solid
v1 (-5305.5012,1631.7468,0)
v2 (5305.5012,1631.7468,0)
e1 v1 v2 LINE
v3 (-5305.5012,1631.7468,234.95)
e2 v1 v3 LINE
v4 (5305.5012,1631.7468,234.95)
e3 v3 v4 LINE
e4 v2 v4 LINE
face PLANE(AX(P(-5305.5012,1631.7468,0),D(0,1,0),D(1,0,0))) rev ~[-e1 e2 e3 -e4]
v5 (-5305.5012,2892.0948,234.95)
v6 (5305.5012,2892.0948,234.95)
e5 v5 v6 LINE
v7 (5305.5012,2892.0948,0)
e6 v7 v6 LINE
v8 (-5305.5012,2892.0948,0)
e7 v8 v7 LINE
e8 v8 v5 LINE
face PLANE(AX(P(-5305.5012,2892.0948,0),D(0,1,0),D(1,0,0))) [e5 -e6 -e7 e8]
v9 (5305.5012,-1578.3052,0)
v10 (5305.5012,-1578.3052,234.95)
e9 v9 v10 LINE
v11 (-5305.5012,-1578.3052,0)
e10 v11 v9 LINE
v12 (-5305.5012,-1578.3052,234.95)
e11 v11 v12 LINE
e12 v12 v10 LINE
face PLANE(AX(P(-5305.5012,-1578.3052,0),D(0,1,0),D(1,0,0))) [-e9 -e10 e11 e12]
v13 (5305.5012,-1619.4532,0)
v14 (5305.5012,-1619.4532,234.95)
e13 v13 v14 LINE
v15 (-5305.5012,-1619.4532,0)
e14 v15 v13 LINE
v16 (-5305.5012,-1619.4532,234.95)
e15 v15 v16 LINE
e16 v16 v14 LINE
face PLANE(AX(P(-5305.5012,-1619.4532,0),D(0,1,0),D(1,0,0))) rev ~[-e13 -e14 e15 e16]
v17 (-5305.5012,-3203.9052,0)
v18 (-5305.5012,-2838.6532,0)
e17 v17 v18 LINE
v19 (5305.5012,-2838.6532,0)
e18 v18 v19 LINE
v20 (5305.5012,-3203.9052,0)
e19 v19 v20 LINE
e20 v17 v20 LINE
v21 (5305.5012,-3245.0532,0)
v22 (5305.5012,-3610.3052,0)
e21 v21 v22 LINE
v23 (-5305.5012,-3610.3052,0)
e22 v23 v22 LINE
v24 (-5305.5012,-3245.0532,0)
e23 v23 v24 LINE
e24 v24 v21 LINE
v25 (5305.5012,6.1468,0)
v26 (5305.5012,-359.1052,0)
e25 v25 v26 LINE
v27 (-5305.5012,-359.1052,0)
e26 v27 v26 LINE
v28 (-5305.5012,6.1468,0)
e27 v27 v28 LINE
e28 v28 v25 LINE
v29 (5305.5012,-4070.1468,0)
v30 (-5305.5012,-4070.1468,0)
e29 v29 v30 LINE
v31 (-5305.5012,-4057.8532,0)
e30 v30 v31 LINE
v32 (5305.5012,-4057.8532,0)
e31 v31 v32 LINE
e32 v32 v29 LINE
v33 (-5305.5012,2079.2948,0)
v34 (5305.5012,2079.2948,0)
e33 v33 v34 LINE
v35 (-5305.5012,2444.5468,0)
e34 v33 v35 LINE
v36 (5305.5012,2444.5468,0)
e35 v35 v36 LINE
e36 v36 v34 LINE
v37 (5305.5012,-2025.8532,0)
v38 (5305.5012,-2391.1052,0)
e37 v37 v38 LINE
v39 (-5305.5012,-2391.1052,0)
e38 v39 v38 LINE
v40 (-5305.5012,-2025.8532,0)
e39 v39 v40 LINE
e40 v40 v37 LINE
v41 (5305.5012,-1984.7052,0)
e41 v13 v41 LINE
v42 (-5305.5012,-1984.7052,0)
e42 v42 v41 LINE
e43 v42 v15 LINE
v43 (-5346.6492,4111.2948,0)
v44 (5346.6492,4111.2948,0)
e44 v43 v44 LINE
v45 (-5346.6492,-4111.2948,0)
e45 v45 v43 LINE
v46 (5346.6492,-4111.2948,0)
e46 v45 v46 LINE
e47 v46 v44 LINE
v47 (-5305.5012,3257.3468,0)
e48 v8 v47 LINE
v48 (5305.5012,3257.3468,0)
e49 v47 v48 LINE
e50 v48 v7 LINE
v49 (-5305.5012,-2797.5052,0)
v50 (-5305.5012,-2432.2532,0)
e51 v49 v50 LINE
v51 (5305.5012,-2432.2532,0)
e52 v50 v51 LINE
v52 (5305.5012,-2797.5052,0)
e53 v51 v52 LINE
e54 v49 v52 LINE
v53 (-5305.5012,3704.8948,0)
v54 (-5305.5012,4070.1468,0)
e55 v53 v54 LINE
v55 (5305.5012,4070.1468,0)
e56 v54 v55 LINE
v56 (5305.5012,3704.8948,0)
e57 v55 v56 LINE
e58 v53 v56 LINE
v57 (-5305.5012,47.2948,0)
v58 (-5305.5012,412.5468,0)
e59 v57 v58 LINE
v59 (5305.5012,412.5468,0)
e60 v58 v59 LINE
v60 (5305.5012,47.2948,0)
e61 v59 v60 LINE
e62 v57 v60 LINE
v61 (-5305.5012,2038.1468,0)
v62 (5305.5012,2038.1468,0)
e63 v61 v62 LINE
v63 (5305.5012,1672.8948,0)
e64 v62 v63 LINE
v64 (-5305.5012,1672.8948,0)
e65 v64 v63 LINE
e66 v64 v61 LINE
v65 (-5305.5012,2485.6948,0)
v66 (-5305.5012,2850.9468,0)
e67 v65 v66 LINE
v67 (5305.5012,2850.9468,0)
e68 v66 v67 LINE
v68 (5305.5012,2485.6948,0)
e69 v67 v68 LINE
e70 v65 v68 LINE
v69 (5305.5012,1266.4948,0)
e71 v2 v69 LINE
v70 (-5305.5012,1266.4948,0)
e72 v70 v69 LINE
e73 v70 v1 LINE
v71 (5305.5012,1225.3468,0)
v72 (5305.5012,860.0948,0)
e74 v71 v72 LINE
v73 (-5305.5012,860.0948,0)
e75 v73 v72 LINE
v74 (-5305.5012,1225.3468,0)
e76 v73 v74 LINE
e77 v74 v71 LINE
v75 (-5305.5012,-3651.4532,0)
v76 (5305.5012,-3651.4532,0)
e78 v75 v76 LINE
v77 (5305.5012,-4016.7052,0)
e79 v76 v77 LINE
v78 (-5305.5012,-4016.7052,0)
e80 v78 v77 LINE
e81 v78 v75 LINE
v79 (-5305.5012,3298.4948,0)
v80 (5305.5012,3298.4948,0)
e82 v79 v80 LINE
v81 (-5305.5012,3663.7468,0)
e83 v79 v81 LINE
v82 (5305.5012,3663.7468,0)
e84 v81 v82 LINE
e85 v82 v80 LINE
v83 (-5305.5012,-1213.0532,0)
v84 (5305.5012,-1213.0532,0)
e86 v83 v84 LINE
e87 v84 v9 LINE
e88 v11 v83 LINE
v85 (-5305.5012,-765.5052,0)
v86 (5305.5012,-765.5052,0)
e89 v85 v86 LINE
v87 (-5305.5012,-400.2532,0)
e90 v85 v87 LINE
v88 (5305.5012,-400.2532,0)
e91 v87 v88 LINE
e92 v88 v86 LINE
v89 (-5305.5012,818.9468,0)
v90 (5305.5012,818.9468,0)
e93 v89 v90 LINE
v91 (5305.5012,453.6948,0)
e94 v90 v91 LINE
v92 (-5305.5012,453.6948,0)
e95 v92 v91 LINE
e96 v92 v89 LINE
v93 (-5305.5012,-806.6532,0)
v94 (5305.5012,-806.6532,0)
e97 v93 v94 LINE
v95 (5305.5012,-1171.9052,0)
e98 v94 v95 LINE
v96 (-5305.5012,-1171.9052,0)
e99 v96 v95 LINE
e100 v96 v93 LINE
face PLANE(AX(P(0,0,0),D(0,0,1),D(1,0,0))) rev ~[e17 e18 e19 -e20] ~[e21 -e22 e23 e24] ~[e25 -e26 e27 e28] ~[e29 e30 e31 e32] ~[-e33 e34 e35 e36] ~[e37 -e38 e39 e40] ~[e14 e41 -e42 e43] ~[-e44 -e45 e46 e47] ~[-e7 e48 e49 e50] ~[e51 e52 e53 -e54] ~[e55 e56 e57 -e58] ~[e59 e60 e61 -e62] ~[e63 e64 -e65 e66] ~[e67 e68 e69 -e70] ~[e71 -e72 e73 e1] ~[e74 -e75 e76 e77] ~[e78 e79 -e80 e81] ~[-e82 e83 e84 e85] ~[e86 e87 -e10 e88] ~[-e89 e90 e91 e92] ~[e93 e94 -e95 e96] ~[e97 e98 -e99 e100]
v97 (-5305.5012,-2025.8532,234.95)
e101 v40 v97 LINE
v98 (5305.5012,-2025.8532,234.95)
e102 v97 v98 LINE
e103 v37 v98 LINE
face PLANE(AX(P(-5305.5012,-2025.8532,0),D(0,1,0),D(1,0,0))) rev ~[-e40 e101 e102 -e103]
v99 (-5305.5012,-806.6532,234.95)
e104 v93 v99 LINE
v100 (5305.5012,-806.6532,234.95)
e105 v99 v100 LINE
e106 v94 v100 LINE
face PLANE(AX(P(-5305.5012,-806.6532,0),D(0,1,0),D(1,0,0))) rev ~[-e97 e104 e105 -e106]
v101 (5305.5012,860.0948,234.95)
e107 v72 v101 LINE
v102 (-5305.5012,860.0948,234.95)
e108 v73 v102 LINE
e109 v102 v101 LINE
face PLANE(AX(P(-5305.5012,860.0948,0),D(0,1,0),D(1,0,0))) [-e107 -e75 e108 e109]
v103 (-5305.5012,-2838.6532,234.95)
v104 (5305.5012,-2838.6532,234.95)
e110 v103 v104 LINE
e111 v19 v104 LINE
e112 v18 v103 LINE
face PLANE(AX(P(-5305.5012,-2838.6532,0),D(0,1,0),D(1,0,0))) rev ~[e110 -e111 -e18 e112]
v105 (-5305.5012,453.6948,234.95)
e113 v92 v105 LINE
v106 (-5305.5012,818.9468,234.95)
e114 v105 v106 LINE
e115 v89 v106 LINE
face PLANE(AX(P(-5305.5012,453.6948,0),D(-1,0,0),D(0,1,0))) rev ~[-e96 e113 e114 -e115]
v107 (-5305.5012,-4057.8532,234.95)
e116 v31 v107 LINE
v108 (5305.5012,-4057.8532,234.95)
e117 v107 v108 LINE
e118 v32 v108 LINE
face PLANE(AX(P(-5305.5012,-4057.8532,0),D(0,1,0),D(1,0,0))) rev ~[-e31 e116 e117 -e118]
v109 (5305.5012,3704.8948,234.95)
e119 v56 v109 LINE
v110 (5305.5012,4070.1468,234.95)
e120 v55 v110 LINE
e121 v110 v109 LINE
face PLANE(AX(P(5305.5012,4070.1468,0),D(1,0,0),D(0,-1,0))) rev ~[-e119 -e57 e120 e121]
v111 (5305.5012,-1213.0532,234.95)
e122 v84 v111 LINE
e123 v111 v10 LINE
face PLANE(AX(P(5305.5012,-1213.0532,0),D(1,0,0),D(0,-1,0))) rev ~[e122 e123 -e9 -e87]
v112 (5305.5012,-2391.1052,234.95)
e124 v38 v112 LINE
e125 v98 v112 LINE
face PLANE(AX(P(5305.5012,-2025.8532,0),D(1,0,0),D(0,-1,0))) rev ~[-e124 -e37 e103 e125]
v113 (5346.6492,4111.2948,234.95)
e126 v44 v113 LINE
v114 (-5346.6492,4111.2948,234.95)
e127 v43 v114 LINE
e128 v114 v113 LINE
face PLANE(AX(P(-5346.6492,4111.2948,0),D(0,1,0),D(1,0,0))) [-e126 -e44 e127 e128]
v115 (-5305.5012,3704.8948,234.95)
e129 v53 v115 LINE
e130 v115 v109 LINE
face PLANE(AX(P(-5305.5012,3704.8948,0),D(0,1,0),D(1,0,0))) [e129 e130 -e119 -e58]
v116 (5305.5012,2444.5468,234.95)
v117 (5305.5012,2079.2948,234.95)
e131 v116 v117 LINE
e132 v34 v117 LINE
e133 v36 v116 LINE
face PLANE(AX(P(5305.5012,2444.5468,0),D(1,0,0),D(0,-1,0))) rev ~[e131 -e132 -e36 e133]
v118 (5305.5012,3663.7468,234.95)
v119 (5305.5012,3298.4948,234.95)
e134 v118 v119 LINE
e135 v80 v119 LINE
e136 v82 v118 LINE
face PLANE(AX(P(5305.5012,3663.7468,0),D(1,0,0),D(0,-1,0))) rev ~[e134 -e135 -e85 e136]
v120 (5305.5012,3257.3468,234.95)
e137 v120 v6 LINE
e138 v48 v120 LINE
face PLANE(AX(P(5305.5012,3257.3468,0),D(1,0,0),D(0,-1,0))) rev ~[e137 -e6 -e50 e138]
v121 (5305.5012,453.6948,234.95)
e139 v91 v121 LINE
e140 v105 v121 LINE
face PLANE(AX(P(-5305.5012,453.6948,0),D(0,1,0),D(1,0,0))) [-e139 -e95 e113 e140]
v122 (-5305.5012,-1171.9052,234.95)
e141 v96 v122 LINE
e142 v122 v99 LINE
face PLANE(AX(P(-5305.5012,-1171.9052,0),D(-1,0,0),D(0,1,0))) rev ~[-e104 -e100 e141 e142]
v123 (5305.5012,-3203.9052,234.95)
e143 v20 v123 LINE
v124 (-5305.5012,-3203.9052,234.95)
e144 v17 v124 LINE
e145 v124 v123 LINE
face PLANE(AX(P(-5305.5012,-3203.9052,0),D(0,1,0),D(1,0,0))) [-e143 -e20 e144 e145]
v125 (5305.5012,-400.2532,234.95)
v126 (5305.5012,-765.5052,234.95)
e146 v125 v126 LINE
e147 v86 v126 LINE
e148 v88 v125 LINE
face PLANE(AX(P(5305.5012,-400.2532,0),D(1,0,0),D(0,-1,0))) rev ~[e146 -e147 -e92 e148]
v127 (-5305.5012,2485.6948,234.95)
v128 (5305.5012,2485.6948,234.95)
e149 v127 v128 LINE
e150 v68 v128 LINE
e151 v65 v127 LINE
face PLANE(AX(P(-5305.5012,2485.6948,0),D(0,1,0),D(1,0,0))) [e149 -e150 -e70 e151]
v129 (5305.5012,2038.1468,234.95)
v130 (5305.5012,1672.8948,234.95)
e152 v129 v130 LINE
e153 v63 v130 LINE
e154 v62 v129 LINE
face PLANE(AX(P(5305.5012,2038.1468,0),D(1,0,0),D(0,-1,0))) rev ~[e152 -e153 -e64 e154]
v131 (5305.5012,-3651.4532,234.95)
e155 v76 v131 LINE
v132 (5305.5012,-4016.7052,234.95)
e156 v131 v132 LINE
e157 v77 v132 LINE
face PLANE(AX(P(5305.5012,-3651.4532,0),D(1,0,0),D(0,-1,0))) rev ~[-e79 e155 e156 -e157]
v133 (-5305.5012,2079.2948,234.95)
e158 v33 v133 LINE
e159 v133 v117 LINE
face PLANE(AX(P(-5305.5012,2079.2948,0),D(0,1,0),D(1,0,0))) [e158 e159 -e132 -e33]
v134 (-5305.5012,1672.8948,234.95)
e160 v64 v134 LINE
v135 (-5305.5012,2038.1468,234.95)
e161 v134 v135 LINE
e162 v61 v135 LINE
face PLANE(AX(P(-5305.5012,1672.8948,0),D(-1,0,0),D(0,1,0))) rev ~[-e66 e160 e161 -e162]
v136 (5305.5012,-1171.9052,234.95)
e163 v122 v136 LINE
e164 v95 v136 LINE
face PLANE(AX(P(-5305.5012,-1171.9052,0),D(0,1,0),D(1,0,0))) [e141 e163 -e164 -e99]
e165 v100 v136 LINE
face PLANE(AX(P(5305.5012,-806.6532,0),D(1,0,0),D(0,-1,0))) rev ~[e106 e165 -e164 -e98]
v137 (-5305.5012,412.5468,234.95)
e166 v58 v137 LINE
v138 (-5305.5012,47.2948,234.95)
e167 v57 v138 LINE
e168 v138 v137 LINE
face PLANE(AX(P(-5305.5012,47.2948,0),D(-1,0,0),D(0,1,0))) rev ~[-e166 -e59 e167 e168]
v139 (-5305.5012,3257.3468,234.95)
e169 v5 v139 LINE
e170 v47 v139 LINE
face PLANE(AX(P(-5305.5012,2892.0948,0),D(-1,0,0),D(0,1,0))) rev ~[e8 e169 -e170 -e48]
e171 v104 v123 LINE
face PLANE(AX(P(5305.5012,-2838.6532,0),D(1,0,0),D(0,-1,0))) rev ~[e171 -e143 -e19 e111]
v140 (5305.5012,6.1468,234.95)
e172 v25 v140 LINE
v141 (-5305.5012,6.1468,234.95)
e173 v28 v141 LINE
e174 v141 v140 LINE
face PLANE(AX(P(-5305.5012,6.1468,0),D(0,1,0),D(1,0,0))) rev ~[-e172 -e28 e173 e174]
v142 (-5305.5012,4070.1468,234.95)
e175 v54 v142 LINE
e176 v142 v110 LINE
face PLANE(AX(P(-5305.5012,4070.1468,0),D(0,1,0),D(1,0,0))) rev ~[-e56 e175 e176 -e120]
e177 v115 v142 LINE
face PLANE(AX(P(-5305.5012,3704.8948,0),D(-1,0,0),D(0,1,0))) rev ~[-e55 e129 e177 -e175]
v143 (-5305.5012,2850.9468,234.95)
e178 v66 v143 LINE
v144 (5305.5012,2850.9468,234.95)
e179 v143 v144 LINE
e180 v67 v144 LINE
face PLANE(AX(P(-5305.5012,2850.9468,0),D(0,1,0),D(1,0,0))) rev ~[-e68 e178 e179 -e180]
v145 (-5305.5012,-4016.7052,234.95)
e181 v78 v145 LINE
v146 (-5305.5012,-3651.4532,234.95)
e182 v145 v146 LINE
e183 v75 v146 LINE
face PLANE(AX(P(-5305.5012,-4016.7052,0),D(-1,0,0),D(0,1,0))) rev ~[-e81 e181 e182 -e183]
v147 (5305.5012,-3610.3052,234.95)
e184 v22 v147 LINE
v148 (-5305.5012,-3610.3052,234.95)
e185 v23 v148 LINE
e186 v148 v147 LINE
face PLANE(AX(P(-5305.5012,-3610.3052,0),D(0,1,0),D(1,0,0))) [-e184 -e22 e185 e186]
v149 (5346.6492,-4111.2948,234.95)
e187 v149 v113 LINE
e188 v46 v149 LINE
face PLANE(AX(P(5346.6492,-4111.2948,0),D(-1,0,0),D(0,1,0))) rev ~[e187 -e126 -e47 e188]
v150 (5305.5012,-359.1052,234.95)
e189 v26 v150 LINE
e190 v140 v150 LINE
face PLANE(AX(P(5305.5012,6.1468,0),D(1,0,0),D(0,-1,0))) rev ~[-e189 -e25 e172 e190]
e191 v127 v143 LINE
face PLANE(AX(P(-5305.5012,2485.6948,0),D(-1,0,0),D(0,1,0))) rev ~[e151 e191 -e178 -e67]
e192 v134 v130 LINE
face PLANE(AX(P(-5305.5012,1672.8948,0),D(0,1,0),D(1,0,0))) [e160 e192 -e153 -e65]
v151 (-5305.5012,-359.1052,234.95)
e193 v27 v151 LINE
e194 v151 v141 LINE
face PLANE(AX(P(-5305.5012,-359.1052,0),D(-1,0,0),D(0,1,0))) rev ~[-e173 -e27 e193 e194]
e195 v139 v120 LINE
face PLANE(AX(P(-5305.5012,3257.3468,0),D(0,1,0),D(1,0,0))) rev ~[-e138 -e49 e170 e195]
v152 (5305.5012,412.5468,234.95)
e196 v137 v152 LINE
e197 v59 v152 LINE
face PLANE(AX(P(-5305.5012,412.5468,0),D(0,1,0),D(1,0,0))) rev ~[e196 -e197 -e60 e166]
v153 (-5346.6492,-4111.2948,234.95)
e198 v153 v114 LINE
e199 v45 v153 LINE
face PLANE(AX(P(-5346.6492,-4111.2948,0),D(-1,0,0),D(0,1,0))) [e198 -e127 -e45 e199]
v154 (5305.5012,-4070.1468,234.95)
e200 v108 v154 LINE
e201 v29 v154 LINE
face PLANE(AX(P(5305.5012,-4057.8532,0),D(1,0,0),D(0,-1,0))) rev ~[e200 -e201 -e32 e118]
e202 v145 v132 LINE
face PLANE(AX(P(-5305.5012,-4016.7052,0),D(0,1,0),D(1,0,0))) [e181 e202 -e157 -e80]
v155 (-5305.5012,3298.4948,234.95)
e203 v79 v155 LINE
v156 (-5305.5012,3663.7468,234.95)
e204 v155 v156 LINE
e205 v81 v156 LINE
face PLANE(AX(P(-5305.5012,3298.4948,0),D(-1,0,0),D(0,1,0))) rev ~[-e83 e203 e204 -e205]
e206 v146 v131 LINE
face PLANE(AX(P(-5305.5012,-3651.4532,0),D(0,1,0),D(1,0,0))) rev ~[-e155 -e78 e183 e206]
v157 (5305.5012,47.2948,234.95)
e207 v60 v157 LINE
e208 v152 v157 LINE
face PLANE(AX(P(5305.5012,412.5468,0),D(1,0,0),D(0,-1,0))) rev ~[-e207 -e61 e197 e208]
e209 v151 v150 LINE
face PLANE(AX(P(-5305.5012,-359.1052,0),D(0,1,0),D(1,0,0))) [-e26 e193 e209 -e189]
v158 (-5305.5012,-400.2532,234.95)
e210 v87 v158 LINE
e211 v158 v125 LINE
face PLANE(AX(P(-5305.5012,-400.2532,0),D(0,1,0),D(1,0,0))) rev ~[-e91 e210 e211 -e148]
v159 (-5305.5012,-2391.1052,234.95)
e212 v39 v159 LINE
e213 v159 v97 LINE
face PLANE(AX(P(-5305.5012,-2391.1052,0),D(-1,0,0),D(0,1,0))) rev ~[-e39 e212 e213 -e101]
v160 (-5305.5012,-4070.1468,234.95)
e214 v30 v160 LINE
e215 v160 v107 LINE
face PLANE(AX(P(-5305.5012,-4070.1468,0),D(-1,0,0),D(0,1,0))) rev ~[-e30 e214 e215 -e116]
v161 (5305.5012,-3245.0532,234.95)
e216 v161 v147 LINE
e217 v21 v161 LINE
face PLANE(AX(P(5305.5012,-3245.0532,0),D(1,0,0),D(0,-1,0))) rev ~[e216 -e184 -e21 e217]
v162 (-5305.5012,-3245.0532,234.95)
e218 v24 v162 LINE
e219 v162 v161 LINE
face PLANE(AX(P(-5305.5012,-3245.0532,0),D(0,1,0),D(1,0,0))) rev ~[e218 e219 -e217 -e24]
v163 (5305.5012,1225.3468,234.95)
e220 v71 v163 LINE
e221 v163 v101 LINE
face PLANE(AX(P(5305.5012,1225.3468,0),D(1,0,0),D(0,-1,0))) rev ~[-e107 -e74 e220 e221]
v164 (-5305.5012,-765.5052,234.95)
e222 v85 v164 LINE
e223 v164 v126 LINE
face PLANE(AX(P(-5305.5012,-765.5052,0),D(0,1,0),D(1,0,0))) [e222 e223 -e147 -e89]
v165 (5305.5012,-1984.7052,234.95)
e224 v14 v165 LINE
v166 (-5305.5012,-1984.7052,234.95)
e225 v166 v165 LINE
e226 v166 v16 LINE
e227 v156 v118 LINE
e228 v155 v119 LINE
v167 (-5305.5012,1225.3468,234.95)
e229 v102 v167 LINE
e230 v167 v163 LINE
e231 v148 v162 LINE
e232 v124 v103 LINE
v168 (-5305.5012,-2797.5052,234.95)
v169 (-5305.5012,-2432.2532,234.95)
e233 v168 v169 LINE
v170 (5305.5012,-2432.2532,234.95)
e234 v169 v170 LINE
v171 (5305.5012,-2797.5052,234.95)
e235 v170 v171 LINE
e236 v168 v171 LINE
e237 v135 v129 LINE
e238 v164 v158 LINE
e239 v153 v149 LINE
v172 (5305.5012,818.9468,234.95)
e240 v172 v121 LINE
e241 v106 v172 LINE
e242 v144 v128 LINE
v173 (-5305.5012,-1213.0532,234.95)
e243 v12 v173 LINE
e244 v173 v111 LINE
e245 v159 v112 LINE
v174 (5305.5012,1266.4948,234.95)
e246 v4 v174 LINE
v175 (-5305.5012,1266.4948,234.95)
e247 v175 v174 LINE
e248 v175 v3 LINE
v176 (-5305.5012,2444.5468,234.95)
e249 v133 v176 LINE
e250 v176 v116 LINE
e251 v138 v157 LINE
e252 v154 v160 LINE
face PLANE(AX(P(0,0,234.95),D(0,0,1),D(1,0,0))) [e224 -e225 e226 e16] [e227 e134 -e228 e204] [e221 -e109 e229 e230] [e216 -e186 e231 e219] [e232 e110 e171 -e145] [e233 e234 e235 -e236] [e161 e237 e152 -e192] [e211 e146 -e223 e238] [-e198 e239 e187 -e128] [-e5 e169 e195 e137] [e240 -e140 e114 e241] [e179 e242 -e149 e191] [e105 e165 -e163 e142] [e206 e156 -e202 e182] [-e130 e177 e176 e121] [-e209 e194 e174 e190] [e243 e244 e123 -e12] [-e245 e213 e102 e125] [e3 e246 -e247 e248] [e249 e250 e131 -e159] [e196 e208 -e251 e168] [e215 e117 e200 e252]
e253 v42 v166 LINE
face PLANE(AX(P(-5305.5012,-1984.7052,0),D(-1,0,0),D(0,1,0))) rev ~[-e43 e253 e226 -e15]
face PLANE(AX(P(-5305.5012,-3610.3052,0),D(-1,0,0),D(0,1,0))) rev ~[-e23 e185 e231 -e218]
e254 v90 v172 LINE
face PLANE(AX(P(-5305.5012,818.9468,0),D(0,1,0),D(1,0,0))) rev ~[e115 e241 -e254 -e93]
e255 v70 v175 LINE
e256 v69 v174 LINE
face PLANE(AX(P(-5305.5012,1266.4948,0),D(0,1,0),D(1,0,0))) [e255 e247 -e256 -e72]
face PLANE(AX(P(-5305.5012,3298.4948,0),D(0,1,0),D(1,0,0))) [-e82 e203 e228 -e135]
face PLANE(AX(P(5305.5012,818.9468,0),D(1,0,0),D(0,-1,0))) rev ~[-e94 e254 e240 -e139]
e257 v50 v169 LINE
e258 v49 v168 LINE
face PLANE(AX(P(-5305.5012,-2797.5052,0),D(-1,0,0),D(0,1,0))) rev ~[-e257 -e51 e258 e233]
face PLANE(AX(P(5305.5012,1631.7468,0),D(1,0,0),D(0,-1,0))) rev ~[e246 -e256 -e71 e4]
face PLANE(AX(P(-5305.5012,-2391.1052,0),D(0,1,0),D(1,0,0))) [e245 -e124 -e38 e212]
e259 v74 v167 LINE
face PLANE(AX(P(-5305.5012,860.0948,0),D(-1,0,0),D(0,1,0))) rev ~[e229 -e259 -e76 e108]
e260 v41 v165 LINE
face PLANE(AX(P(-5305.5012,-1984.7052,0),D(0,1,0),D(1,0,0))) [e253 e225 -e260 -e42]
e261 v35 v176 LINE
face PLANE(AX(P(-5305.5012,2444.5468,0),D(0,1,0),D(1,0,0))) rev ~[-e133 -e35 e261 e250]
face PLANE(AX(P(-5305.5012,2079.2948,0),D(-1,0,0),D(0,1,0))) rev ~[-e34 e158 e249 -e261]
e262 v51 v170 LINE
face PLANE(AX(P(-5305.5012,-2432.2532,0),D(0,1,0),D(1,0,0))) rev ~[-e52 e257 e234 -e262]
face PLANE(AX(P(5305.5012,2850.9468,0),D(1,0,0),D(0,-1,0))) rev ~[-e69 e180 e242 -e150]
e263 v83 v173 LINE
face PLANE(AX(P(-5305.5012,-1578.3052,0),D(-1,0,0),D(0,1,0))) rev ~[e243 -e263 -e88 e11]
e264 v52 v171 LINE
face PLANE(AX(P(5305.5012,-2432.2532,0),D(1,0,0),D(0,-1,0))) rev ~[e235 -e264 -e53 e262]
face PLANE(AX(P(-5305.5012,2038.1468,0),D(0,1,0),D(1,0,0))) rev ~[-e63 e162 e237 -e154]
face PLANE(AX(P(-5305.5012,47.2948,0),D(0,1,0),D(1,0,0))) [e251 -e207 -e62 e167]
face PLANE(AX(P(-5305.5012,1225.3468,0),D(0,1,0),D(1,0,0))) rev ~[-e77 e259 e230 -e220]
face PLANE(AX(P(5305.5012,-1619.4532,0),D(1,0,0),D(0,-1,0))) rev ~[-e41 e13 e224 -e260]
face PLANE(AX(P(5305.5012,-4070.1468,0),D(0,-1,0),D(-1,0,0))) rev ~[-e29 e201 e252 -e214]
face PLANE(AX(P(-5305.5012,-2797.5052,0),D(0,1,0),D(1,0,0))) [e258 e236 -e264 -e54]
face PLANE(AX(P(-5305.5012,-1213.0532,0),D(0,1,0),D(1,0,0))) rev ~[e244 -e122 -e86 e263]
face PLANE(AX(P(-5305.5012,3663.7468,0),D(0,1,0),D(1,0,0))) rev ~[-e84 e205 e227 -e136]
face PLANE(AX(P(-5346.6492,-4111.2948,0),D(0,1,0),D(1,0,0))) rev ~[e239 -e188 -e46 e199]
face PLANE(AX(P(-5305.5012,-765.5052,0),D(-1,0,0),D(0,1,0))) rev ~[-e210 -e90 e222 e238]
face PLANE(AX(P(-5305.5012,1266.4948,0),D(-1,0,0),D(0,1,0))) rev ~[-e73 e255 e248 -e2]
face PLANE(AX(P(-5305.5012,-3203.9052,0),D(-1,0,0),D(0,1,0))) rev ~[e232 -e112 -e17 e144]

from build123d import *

# Parameters (mm, degrees)
F0_W     = 10693.2984
F0_H     = 8222.5896
F0_W_2   = 10611.0024
F0_H_2   = 41.148
F1_DEPTH = 234.95


with BuildPart() as f1:
    # F0 (on Top) → F1 (new body)
    with BuildSketch(Plane.XY):
        Rectangle(F0_W, F0_H)
        Polygon((5305.5012, -4057.8532), (5305.5012, -4070.1468), (-5305.5012, -4070.1468), (-5305.5012, -4057.8532), (-5305.5012, -4016.7052), (-5305.5012, -3651.4532), (-5305.5012, -3610.3052), (-5305.5012, -3245.0532), (-5305.5012, -3203.9052), (-5305.5012, -2838.6532), (-5305.5012, -2797.5052), (-5305.5012, -2432.2532), (-5305.5012, -2391.1052), (-5305.5012, -2025.8532), (-5305.5012, -1984.7052), (-5305.5012, -1619.4532), (-5305.5012, -1578.3052), (-5305.5012, -1213.0532), (-5305.5012, -1171.9052), (-5305.5012, -806.6532), (-5305.5012, -765.5052), (-5305.5012, -400.2532), (-5305.5012, -359.1052), (-5305.5012, 6.1468), (-5305.5012, 47.2948), (-5305.5012, 412.5468), (-5305.5012, 453.6948), (-5305.5012, 818.9468), (-5305.5012, 860.0948), (-5305.5012, 1225.3468), (-5305.5012, 1266.4948), (-5305.5012, 1631.7468), (-5305.5012, 1672.8948), (-5305.5012, 2038.1468), (-5305.5012, 2079.2948), (-5305.5012, 2444.5468), (-5305.5012, 2485.6948), (-5305.5012, 2850.9468), (-5305.5012, 2892.0948), (-5305.5012, 3257.3468), (-5305.5012, 3298.4948), (-5305.5012, 3663.7468), (-5305.5012, 3704.8948), (-5305.5012, 4070.1468), (5305.5012, 4070.1468), (5305.5012, 3704.8948), (5305.5012, 3663.7468), (5305.5012, 3298.4948), (5305.5012, 3257.3468), (5305.5012, 2892.0948), (5305.5012, 2850.9468), (5305.5012, 2485.6948), (5305.5012, 2444.5468), (5305.5012, 2079.2948), (5305.5012, 2038.1468), (5305.5012, 1672.8948), (5305.5012, 1631.7468), (5305.5012, 1266.4948), (5305.5012, 1225.3468), (5305.5012, 860.0948), (5305.5012, 818.9468), (5305.5012, 453.6948), (5305.5012, 412.5468), (5305.5012, 47.2948), (5305.5012, 6.1468), (5305.5012, -359.1052), (5305.5012, -400.2532), (5305.5012, -765.5052), (5305.5012, -806.6532), (5305.5012, -1171.9052), (5305.5012, -1213.0532), (5305.5012, -1578.3052), (5305.5012, -1619.4532), (5305.5012, -1984.7052), (5305.5012, -2025.8532), (5305.5012, -2391.1052), (5305.5012, -2432.2532), (5305.5012, -2797.5052), (5305.5012, -2838.6532), (5305.5012, -3203.9052), (5305.5012, -3245.0532), (5305.5012, -3610.3052), (5305.5012, -3651.4532), (5305.5012, -4016.7052), align=None, mode=Mode.SUBTRACT)
        with Locations((0, 3684.3208)):
            Rectangle(F0_W_2, F0_H_2)
        with Locations((0, 3277.9208)):
            Rectangle(F0_W_2, F0_H_2)
        with Locations((0, 2871.5208)):
            Rectangle(F0_W_2, F0_H_2)
        with Locations((0, 2465.1208)):
            Rectangle(F0_W_2, F0_H_2)
        with Locations((0, 2058.7208)):
            Rectangle(F0_W_2, F0_H_2)
        with Locations((0, 1652.3208)):
            Rectangle(F0_W_2, F0_H_2)
        with Locations((0, 1245.9208)):
            Rectangle(F0_W_2, F0_H_2)
        with Locations((0, 839.5208)):
            Rectangle(F0_W_2, F0_H_2)
        with Locations((0, 433.1208)):
            Rectangle(F0_W_2, F0_H_2)
        with Locations((0, 26.7208)):
            Rectangle(F0_W_2, F0_H_2)
        with Locations((0, -379.6792)):
            Rectangle(F0_W_2, F0_H_2)
        with Locations((0, -786.0792)):
            Rectangle(F0_W_2, F0_H_2)
        with Locations((0, -1192.4792)):
            Rectangle(F0_W_2, F0_H_2)
        with Locations((0, -1598.8792)):
            Rectangle(F0_W_2, F0_H_2)
        with Locations((0, -2005.2792)):
            Rectangle(F0_W_2, F0_H_2)
        with Locations((0, -2411.6792)):
            Rectangle(F0_W_2, F0_H_2)
        with Locations((0, -2818.0792)):
            Rectangle(F0_W_2, F0_H_2)
        with Locations((0, -3224.4792)):
            Rectangle(F0_W_2, F0_H_2)
        with Locations((0, -3630.8792)):
            Rectangle(F0_W_2, F0_H_2)
        with Locations((0, -4037.2792)):
            Rectangle(F0_W_2, F0_H_2)
    extrude(amount=F1_DEPTH)


solid = f1.part
